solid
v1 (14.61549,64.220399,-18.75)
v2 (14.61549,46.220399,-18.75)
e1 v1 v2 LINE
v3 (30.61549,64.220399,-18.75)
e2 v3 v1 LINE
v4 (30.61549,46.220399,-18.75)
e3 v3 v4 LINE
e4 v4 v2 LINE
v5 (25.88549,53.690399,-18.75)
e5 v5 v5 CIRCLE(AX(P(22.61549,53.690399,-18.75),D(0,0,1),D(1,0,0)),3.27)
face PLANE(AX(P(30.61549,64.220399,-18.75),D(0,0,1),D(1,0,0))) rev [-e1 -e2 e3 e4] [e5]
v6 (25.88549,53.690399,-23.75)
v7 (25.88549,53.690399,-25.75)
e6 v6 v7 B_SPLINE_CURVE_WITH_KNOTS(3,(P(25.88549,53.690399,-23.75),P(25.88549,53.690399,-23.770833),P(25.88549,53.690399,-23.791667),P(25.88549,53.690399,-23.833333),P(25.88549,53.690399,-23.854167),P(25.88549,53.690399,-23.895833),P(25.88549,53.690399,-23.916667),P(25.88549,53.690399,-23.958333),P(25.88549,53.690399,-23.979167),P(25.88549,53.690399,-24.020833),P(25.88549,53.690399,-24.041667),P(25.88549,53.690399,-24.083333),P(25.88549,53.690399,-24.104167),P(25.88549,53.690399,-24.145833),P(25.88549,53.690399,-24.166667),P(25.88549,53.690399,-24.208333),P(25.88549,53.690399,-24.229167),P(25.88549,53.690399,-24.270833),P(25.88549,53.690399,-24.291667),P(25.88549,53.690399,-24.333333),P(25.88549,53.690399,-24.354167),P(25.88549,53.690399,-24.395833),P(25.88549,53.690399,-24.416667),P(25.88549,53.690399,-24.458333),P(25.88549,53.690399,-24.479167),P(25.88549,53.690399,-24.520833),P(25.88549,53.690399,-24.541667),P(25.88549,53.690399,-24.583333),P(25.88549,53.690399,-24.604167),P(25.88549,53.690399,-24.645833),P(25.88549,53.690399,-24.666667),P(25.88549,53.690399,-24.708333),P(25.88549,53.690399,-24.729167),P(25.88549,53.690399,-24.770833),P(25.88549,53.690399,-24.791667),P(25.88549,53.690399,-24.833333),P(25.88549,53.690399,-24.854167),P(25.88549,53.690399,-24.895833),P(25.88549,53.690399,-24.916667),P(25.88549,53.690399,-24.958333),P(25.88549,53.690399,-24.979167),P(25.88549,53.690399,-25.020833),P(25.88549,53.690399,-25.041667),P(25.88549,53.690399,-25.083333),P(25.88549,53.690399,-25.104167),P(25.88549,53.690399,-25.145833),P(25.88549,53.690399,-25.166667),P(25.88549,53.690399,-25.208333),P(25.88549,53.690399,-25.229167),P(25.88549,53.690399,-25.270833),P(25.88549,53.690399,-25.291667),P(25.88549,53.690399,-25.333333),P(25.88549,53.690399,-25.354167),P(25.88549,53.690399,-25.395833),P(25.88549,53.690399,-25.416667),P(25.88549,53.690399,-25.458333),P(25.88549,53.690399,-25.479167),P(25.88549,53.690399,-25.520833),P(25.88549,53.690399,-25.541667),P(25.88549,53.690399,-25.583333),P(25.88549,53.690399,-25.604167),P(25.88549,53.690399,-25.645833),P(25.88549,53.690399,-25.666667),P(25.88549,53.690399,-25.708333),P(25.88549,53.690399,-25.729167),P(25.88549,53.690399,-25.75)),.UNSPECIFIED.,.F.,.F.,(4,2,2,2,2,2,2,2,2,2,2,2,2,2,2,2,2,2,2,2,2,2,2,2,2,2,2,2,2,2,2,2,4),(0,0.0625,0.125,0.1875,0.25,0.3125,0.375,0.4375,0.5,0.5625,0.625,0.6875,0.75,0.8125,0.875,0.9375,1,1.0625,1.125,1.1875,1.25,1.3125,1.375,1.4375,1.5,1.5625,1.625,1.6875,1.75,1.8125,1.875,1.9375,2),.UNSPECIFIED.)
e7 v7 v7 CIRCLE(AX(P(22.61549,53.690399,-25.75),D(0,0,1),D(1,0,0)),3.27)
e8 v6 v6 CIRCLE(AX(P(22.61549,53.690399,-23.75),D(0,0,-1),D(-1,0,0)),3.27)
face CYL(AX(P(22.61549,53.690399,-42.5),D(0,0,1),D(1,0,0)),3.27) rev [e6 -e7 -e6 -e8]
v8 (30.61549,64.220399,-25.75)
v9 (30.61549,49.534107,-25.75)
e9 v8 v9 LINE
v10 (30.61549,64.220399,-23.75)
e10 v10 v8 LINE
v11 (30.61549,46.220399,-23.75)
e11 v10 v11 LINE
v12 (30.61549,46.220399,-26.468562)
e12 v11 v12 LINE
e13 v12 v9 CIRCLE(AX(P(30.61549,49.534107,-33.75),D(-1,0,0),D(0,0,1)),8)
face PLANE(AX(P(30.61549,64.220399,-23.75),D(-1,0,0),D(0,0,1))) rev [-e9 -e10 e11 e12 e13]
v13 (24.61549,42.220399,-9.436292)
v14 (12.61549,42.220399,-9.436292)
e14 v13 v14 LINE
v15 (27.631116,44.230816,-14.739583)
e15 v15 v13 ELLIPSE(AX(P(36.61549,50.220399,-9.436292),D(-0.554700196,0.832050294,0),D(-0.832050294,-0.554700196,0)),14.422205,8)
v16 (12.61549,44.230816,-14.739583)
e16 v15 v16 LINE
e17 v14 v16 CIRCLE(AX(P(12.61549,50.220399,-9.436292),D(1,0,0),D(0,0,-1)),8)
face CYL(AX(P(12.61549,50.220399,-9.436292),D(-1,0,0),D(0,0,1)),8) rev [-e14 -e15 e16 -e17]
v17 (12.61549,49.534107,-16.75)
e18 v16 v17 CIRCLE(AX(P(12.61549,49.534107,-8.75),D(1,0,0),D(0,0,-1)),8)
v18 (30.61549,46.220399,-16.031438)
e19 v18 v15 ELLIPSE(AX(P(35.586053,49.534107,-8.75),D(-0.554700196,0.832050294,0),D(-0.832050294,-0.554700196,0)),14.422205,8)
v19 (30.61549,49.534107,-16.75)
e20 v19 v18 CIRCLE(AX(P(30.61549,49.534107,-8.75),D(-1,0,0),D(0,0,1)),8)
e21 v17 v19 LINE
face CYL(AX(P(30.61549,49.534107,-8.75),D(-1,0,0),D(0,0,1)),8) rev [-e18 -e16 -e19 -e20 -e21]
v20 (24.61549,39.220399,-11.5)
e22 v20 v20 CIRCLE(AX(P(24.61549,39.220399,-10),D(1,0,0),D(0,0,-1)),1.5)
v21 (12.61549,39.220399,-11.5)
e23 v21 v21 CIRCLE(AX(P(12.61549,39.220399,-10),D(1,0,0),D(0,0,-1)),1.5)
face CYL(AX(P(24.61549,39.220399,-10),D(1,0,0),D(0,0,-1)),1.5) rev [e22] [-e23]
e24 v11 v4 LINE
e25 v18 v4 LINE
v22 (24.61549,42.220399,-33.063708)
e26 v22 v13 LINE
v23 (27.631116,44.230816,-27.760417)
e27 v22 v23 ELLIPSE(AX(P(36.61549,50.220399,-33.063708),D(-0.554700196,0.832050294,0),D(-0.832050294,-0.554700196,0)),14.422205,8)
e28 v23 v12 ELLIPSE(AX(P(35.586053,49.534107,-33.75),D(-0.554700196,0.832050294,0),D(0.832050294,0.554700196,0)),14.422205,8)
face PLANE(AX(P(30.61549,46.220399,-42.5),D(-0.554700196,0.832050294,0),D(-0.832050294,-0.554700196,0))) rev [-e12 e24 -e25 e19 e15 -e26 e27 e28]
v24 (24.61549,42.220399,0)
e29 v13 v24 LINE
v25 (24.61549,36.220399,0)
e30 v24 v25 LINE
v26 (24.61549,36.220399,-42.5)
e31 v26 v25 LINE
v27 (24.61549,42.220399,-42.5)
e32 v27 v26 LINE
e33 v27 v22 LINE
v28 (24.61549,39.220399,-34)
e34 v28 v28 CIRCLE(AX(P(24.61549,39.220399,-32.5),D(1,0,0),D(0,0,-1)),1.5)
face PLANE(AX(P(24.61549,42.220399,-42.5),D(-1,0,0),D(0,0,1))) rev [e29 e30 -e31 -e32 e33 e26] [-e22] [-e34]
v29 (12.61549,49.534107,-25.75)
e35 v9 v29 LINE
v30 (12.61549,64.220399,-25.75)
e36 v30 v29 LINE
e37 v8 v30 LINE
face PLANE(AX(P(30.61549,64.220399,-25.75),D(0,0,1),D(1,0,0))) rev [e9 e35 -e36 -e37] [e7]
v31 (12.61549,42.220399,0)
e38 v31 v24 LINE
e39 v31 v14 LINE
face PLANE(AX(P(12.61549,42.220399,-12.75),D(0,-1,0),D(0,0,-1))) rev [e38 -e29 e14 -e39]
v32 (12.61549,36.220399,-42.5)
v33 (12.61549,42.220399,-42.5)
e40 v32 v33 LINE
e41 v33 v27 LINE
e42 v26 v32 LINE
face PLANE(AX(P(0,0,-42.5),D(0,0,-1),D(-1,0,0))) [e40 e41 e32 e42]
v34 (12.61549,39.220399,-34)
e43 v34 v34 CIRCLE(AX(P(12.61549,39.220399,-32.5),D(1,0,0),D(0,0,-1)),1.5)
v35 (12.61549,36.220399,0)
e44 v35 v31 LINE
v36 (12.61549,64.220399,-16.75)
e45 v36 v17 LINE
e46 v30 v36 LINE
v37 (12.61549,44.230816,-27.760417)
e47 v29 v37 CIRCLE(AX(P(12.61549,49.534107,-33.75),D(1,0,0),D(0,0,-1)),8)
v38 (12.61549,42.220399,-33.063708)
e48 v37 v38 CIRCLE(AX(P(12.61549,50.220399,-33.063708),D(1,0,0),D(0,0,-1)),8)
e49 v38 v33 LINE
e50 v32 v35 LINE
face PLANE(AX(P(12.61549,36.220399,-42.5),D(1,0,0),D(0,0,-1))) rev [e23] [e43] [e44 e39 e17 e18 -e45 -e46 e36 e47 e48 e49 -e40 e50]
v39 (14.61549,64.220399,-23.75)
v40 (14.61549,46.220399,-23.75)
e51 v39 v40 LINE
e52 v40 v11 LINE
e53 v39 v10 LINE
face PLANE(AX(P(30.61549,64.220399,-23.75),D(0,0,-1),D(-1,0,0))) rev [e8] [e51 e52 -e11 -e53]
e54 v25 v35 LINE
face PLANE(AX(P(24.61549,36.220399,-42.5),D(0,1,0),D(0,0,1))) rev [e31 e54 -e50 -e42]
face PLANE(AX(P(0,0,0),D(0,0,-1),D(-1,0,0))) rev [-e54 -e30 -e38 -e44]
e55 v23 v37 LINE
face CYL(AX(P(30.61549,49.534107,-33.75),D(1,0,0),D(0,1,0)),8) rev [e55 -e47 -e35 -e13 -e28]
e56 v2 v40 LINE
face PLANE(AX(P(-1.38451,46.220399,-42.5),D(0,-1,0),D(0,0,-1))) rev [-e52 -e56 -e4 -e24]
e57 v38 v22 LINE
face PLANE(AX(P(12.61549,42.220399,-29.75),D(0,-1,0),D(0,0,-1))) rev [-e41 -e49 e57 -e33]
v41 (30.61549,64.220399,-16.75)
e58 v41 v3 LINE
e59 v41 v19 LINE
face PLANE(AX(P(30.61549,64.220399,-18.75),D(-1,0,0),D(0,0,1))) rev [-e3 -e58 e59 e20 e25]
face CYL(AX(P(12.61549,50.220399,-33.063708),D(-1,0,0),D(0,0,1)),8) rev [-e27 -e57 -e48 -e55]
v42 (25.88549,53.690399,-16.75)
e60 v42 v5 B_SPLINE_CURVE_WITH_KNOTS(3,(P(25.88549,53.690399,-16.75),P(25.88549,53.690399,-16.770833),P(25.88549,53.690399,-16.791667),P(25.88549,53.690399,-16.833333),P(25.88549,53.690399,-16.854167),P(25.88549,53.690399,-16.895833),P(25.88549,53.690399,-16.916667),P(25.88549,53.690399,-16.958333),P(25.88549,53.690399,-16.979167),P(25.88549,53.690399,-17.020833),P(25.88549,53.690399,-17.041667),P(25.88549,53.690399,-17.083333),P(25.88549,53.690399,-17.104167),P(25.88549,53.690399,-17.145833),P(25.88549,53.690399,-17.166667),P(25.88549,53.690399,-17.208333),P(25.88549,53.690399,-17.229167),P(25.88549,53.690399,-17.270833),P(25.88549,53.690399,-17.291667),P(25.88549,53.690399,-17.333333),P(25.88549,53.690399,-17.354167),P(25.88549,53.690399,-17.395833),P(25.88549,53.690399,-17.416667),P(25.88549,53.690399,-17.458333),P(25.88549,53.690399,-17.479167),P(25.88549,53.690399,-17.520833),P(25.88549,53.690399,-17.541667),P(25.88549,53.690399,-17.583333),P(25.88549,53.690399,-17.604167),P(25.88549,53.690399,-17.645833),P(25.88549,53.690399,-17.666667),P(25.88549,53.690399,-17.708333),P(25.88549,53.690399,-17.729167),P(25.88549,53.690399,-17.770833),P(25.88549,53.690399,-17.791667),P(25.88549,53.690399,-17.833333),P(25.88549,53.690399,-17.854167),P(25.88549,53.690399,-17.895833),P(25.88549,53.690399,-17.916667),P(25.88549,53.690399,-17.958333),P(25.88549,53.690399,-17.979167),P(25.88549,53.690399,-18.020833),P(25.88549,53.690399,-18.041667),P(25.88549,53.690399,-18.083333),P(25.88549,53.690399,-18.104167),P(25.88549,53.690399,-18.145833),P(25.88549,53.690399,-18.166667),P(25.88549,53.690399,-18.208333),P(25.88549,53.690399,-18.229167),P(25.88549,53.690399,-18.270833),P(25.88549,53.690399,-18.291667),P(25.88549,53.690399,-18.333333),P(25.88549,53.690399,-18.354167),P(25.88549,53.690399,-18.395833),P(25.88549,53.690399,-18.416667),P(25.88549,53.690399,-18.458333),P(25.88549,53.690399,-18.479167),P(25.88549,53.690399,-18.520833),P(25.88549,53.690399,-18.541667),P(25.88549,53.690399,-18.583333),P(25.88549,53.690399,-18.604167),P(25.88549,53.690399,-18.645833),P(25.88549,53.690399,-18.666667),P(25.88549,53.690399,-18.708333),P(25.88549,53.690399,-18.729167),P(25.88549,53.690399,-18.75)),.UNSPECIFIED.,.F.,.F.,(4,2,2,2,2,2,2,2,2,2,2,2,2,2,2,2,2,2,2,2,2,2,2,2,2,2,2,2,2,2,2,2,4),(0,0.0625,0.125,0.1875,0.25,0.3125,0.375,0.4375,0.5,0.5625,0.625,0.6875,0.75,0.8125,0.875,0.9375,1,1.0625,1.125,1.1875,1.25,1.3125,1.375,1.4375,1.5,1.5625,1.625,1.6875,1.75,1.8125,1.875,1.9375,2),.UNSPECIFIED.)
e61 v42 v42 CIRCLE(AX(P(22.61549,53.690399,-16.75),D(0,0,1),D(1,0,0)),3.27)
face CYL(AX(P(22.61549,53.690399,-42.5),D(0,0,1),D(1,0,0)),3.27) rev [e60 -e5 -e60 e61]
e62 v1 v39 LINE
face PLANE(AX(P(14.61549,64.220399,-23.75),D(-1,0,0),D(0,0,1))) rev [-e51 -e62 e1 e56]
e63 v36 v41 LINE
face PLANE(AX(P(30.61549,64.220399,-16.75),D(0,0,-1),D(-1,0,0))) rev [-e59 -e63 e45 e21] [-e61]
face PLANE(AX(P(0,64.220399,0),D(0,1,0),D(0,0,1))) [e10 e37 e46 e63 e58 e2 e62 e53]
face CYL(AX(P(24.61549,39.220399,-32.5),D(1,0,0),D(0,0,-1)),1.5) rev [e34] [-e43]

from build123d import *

# Parameters (mm, degrees)
BOSS_EXTRU_1_DEPTH           = 42.5
D_GAGEMENT_M31_D             = 3
BOSS_EXTRU_2_DEPTH           = 18
ESQUISSE7_R                  = 3.27
ENL_V_MAT_EXTRU_1_DEPTH      = 80.23684853
ENL_V_MAT_EXTRU_2_DEPTH      = 87.149089751
ENL_V_MAT_EXTRU_3_DEPTH      = 78.939140419
ENL_V_MAT_EXTRU_3_DEPTH_BACK = 78.939140419
CONG_4_R                     = 8


with BuildPart() as part:
    # Esquisse1 → Boss.-Extru.1 (new body)
    with BuildSketch(Plane(origin=(0, 0, 0), x_dir=(1, 0, 0), z_dir=(0, 0, -1))):
        Polygon((-1.384510159, -46.220398701), (38.615489841, -46.220398701), (38.615489841, -42.220398701), (24.615489841, -42.220398701), (24.615489841, -36.220398701), (12.615489841, -36.220398701), (12.615489841, -42.220398701), (-1.384510159, -42.220398701), align=None)
    extrude(amount=BOSS_EXTRU_1_DEPTH)

    # Dégagement M31 (through all)
    with Locations(Plane(origin=(24.615489841, 0, 0), x_dir=(0, 0, -1), z_dir=(1, 0, 0))):
        with Locations((10, 39.220398701), (32.5, 39.220398701)):
            Hole(D_GAGEMENT_M31_D / 2)

    # Esquisse6 → Boss.-Extru.2 (add)
    with BuildSketch(Plane(origin=(0, 46.220398701, 0), x_dir=(1, 0, 0), z_dir=(0, 1, 0))):
        Polygon((30.615489841, 23.75), (14.615489841, 23.75), (14.615489841, 18.75), (30.615489841, 18.75), (30.615489841, 16.75), (12.615489841, 16.75), (12.615489841, 25.75), (30.615489841, 25.75), align=None)
    extrude(amount=BOSS_EXTRU_2_DEPTH)

    # Esquisse7 → Enlèv. mat.-Extru.1 (cut, through all)
    with BuildSketch(Plane.XY.offset(-16.75)):
        with Locations((22.615489841, 53.690398701)):
            Circle(ESQUISSE7_R)
    extrude(amount=-ENL_V_MAT_EXTRU_1_DEPTH, mode=Mode.SUBTRACT)

    # Esquisse8 → Enlèv. mat.-Extru.2 (cut, through all)
    with BuildSketch(Plane.XY):
        Polygon((30.615489841, 46.220398701), (24.615489841, 42.220398701), (24.615489841, 36.220398701), (12.615489841, 36.220398701), (12.615489841, 42.220398701), (12.615489841, 46.220398701), (-1.384510159, 46.220398701), (-1.384510159, 34.129389344), (38.615489841, 34.129389344), (38.615489841, 46.220398701), align=None)
    extrude(amount=-ENL_V_MAT_EXTRU_2_DEPTH, mode=Mode.SUBTRACT)

    # Esquisse9 → Enlèv. mat.-Extru.3 (cut, two sides: drawn at the far end of the back side and taken through both)
    with BuildSketch(Plane(origin=(24.615489841, 0, 0), x_dir=(0, 0, -1), z_dir=(1, 0, 0)).offset(-ENL_V_MAT_EXTRU_3_DEPTH_BACK)):
        Polygon((16.75, 46.220398701), (12.75, 42.220398701), (0, 42.220398701), (0, 46.220398701), align=None)
        Polygon((25.75, 46.220398701), (29.75, 42.220398701), (42.5, 42.220398701), (42.5, 46.220398701), align=None)
    extrude(amount=ENL_V_MAT_EXTRU_3_DEPTH + ENL_V_MAT_EXTRU_3_DEPTH_BACK, mode=Mode.SUBTRACT)

    # Congé4
    # the kernel refuses this fillet: 8 mm, written as the material it adds along each edge
    with BuildSketch(Plane(origin=(32.899761088, 42.220398701, -12.75), x_dir=(0, 0.7071067811865437, -0.7071067811865512), z_dir=(-1, 0, 0))) as cong_4_piece_1_section:
        with BuildLine():
            CenterArc((CONG_4_R * 0.414213562373, -CONG_4_R), CONG_4_R, 90, 45)
            Line((-CONG_4_R * 0.292893218813, -CONG_4_R * 0.292893218813), (0, 0))
            Line((0, 0), (CONG_4_R * 0.414213562373, 0))
        make_face()
    cong_4_piece_1 = extrude(amount=20.284271247, mode=Mode.PRIVATE)
    cong_4_piece_1 = split(cong_4_piece_1, bisect_by=Plane(origin=(25.761131429, 42.984159759, -13.773553438), z_dir=(-0.5547001962252294, 0.8320502943378435, 0)), keep=Keep.TOP, mode=Mode.PRIVATE)
    cong_4_piece_1 = split(cong_4_piece_1, bisect_by=Plane(origin=(24.615489841, 43.38850385, -13.773553438), z_dir=(1, 0, 0)), keep=Keep.TOP, mode=Mode.PRIVATE)
    add(cong_4_piece_1)
    with BuildSketch(Plane(origin=(24.615489841, 42.220398701, -12.75), x_dir=(0, 0.7071067811865432, -0.7071067811865518), z_dir=(-1, 0, 0))) as cong_4_piece_2_section:
        with BuildLine():
            CenterArc((CONG_4_R * 0.414213562373, -CONG_4_R), CONG_4_R, 90, 45)
            Line((-CONG_4_R * 0.292893218813, -CONG_4_R * 0.292893218813), (0, 0))
            Line((0, 0), (CONG_4_R * 0.414213562373, 0))
        make_face()
    cong_4_piece_2 = extrude(amount=12, mode=Mode.PRIVATE)
    cong_4_piece_2 = split(cong_4_piece_2, bisect_by=Plane(origin=(20.681270928, 39.597586092, -12.548310033), z_dir=(-0.5547001962252294, 0.8320502943378435, 0)), keep=Keep.TOP, mode=Mode.PRIVATE)
    add(cong_4_piece_2)
    with BuildSketch(Plane(origin=(30.615489841, 46.220398701, -16.75), x_dir=(0, 1, 0), z_dir=(-1, 0, 0))) as cong_4_piece_3_section:
        with BuildLine():
            CenterArc((CONG_4_R * 0.414213562373, -CONG_4_R), CONG_4_R, 90, 45)
            Line((-CONG_4_R * 0.292893218813, -CONG_4_R * 0.292893218813), (0, 0))
            Line((0, 0), (CONG_4_R * 0.414213562373, 0))
        make_face()
    cong_4_piece_3 = extrude(amount=18, mode=Mode.PRIVATE)
    cong_4_piece_3 = split(cong_4_piece_3, bisect_by=Plane(origin=(24.307561612, 42.015113215, -16.286257704), z_dir=(-0.5547001962252294, 0.8320502943378435, 0)), keep=Keep.TOP, mode=Mode.PRIVATE)
    add(cong_4_piece_3)
    with BuildSketch(Plane(origin=(12.615489841, 46.220398701, -25.75), x_dir=(0, 1, 0), z_dir=(1, 0, 0))) as cong_4_piece_4_section:
        with BuildLine():
            CenterArc((CONG_4_R * 0.414213562373, -CONG_4_R), CONG_4_R, 90, 45)
            Line((-CONG_4_R * 0.292893218813, -CONG_4_R * 0.292893218813), (0, 0))
            Line((0, 0), (CONG_4_R * 0.414213562373, 0))
        make_face()
    cong_4_piece_4 = extrude(amount=18, mode=Mode.PRIVATE)
    cong_4_piece_4 = split(cong_4_piece_4, bisect_by=Plane(origin=(24.307561612, 42.015113215, -26.213742296), z_dir=(-0.5547001962252294, 0.8320502943378435, 0)), keep=Keep.TOP, mode=Mode.PRIVATE)
    add(cong_4_piece_4)
    with BuildSketch(Plane(origin=(12.615489841, 42.220398701, -29.75), x_dir=(0, 0.7071067811865519, 0.7071067811865432), z_dir=(1, 0, 0))) as cong_4_piece_5_section:
        with BuildLine():
            CenterArc((CONG_4_R * 0.414213562373, -CONG_4_R), CONG_4_R, 90, 45)
            Line((-CONG_4_R * 0.292893218813, -CONG_4_R * 0.292893218813), (0, 0))
            Line((0, 0), (CONG_4_R * 0.414213562373, 0))
        make_face()
    cong_4_piece_5 = extrude(amount=12, mode=Mode.PRIVATE)
    cong_4_piece_5 = split(cong_4_piece_5, bisect_by=Plane(origin=(20.681270928, 39.597586092, -29.951689967), z_dir=(-0.5547001962252294, 0.8320502943378435, 0)), keep=Keep.TOP, mode=Mode.PRIVATE)
    add(cong_4_piece_5)
    with BuildSketch(Plane(origin=(12.615489841, 42.220398701, -29.75), x_dir=(0, 0.7071067811865519, 0.7071067811865432), z_dir=(1, 0, 0))) as cong_4_piece_6_section:
        with BuildLine():
            CenterArc((CONG_4_R * 0.414213562373, -CONG_4_R), CONG_4_R, 90, 45)
            Line((-CONG_4_R * 0.292893218813, -CONG_4_R * 0.292893218813), (0, 0))
            Line((0, 0), (CONG_4_R * 0.414213562373, 0))
        make_face()
    cong_4_piece_6 = extrude(amount=20.284271247, mode=Mode.PRIVATE)
    cong_4_piece_6 = split(cong_4_piece_6, bisect_by=Plane(origin=(25.761131429, 42.984159759, -28.726446562), z_dir=(-0.5547001962252294, 0.8320502943378435, 0)), keep=Keep.TOP, mode=Mode.PRIVATE)
    cong_4_piece_6 = split(cong_4_piece_6, bisect_by=Plane(origin=(24.615489841, 43.38850385, -28.726446562), z_dir=(1, 0, 0)), keep=Keep.TOP, mode=Mode.PRIVATE)
    add(cong_4_piece_6)


solid = part.part
